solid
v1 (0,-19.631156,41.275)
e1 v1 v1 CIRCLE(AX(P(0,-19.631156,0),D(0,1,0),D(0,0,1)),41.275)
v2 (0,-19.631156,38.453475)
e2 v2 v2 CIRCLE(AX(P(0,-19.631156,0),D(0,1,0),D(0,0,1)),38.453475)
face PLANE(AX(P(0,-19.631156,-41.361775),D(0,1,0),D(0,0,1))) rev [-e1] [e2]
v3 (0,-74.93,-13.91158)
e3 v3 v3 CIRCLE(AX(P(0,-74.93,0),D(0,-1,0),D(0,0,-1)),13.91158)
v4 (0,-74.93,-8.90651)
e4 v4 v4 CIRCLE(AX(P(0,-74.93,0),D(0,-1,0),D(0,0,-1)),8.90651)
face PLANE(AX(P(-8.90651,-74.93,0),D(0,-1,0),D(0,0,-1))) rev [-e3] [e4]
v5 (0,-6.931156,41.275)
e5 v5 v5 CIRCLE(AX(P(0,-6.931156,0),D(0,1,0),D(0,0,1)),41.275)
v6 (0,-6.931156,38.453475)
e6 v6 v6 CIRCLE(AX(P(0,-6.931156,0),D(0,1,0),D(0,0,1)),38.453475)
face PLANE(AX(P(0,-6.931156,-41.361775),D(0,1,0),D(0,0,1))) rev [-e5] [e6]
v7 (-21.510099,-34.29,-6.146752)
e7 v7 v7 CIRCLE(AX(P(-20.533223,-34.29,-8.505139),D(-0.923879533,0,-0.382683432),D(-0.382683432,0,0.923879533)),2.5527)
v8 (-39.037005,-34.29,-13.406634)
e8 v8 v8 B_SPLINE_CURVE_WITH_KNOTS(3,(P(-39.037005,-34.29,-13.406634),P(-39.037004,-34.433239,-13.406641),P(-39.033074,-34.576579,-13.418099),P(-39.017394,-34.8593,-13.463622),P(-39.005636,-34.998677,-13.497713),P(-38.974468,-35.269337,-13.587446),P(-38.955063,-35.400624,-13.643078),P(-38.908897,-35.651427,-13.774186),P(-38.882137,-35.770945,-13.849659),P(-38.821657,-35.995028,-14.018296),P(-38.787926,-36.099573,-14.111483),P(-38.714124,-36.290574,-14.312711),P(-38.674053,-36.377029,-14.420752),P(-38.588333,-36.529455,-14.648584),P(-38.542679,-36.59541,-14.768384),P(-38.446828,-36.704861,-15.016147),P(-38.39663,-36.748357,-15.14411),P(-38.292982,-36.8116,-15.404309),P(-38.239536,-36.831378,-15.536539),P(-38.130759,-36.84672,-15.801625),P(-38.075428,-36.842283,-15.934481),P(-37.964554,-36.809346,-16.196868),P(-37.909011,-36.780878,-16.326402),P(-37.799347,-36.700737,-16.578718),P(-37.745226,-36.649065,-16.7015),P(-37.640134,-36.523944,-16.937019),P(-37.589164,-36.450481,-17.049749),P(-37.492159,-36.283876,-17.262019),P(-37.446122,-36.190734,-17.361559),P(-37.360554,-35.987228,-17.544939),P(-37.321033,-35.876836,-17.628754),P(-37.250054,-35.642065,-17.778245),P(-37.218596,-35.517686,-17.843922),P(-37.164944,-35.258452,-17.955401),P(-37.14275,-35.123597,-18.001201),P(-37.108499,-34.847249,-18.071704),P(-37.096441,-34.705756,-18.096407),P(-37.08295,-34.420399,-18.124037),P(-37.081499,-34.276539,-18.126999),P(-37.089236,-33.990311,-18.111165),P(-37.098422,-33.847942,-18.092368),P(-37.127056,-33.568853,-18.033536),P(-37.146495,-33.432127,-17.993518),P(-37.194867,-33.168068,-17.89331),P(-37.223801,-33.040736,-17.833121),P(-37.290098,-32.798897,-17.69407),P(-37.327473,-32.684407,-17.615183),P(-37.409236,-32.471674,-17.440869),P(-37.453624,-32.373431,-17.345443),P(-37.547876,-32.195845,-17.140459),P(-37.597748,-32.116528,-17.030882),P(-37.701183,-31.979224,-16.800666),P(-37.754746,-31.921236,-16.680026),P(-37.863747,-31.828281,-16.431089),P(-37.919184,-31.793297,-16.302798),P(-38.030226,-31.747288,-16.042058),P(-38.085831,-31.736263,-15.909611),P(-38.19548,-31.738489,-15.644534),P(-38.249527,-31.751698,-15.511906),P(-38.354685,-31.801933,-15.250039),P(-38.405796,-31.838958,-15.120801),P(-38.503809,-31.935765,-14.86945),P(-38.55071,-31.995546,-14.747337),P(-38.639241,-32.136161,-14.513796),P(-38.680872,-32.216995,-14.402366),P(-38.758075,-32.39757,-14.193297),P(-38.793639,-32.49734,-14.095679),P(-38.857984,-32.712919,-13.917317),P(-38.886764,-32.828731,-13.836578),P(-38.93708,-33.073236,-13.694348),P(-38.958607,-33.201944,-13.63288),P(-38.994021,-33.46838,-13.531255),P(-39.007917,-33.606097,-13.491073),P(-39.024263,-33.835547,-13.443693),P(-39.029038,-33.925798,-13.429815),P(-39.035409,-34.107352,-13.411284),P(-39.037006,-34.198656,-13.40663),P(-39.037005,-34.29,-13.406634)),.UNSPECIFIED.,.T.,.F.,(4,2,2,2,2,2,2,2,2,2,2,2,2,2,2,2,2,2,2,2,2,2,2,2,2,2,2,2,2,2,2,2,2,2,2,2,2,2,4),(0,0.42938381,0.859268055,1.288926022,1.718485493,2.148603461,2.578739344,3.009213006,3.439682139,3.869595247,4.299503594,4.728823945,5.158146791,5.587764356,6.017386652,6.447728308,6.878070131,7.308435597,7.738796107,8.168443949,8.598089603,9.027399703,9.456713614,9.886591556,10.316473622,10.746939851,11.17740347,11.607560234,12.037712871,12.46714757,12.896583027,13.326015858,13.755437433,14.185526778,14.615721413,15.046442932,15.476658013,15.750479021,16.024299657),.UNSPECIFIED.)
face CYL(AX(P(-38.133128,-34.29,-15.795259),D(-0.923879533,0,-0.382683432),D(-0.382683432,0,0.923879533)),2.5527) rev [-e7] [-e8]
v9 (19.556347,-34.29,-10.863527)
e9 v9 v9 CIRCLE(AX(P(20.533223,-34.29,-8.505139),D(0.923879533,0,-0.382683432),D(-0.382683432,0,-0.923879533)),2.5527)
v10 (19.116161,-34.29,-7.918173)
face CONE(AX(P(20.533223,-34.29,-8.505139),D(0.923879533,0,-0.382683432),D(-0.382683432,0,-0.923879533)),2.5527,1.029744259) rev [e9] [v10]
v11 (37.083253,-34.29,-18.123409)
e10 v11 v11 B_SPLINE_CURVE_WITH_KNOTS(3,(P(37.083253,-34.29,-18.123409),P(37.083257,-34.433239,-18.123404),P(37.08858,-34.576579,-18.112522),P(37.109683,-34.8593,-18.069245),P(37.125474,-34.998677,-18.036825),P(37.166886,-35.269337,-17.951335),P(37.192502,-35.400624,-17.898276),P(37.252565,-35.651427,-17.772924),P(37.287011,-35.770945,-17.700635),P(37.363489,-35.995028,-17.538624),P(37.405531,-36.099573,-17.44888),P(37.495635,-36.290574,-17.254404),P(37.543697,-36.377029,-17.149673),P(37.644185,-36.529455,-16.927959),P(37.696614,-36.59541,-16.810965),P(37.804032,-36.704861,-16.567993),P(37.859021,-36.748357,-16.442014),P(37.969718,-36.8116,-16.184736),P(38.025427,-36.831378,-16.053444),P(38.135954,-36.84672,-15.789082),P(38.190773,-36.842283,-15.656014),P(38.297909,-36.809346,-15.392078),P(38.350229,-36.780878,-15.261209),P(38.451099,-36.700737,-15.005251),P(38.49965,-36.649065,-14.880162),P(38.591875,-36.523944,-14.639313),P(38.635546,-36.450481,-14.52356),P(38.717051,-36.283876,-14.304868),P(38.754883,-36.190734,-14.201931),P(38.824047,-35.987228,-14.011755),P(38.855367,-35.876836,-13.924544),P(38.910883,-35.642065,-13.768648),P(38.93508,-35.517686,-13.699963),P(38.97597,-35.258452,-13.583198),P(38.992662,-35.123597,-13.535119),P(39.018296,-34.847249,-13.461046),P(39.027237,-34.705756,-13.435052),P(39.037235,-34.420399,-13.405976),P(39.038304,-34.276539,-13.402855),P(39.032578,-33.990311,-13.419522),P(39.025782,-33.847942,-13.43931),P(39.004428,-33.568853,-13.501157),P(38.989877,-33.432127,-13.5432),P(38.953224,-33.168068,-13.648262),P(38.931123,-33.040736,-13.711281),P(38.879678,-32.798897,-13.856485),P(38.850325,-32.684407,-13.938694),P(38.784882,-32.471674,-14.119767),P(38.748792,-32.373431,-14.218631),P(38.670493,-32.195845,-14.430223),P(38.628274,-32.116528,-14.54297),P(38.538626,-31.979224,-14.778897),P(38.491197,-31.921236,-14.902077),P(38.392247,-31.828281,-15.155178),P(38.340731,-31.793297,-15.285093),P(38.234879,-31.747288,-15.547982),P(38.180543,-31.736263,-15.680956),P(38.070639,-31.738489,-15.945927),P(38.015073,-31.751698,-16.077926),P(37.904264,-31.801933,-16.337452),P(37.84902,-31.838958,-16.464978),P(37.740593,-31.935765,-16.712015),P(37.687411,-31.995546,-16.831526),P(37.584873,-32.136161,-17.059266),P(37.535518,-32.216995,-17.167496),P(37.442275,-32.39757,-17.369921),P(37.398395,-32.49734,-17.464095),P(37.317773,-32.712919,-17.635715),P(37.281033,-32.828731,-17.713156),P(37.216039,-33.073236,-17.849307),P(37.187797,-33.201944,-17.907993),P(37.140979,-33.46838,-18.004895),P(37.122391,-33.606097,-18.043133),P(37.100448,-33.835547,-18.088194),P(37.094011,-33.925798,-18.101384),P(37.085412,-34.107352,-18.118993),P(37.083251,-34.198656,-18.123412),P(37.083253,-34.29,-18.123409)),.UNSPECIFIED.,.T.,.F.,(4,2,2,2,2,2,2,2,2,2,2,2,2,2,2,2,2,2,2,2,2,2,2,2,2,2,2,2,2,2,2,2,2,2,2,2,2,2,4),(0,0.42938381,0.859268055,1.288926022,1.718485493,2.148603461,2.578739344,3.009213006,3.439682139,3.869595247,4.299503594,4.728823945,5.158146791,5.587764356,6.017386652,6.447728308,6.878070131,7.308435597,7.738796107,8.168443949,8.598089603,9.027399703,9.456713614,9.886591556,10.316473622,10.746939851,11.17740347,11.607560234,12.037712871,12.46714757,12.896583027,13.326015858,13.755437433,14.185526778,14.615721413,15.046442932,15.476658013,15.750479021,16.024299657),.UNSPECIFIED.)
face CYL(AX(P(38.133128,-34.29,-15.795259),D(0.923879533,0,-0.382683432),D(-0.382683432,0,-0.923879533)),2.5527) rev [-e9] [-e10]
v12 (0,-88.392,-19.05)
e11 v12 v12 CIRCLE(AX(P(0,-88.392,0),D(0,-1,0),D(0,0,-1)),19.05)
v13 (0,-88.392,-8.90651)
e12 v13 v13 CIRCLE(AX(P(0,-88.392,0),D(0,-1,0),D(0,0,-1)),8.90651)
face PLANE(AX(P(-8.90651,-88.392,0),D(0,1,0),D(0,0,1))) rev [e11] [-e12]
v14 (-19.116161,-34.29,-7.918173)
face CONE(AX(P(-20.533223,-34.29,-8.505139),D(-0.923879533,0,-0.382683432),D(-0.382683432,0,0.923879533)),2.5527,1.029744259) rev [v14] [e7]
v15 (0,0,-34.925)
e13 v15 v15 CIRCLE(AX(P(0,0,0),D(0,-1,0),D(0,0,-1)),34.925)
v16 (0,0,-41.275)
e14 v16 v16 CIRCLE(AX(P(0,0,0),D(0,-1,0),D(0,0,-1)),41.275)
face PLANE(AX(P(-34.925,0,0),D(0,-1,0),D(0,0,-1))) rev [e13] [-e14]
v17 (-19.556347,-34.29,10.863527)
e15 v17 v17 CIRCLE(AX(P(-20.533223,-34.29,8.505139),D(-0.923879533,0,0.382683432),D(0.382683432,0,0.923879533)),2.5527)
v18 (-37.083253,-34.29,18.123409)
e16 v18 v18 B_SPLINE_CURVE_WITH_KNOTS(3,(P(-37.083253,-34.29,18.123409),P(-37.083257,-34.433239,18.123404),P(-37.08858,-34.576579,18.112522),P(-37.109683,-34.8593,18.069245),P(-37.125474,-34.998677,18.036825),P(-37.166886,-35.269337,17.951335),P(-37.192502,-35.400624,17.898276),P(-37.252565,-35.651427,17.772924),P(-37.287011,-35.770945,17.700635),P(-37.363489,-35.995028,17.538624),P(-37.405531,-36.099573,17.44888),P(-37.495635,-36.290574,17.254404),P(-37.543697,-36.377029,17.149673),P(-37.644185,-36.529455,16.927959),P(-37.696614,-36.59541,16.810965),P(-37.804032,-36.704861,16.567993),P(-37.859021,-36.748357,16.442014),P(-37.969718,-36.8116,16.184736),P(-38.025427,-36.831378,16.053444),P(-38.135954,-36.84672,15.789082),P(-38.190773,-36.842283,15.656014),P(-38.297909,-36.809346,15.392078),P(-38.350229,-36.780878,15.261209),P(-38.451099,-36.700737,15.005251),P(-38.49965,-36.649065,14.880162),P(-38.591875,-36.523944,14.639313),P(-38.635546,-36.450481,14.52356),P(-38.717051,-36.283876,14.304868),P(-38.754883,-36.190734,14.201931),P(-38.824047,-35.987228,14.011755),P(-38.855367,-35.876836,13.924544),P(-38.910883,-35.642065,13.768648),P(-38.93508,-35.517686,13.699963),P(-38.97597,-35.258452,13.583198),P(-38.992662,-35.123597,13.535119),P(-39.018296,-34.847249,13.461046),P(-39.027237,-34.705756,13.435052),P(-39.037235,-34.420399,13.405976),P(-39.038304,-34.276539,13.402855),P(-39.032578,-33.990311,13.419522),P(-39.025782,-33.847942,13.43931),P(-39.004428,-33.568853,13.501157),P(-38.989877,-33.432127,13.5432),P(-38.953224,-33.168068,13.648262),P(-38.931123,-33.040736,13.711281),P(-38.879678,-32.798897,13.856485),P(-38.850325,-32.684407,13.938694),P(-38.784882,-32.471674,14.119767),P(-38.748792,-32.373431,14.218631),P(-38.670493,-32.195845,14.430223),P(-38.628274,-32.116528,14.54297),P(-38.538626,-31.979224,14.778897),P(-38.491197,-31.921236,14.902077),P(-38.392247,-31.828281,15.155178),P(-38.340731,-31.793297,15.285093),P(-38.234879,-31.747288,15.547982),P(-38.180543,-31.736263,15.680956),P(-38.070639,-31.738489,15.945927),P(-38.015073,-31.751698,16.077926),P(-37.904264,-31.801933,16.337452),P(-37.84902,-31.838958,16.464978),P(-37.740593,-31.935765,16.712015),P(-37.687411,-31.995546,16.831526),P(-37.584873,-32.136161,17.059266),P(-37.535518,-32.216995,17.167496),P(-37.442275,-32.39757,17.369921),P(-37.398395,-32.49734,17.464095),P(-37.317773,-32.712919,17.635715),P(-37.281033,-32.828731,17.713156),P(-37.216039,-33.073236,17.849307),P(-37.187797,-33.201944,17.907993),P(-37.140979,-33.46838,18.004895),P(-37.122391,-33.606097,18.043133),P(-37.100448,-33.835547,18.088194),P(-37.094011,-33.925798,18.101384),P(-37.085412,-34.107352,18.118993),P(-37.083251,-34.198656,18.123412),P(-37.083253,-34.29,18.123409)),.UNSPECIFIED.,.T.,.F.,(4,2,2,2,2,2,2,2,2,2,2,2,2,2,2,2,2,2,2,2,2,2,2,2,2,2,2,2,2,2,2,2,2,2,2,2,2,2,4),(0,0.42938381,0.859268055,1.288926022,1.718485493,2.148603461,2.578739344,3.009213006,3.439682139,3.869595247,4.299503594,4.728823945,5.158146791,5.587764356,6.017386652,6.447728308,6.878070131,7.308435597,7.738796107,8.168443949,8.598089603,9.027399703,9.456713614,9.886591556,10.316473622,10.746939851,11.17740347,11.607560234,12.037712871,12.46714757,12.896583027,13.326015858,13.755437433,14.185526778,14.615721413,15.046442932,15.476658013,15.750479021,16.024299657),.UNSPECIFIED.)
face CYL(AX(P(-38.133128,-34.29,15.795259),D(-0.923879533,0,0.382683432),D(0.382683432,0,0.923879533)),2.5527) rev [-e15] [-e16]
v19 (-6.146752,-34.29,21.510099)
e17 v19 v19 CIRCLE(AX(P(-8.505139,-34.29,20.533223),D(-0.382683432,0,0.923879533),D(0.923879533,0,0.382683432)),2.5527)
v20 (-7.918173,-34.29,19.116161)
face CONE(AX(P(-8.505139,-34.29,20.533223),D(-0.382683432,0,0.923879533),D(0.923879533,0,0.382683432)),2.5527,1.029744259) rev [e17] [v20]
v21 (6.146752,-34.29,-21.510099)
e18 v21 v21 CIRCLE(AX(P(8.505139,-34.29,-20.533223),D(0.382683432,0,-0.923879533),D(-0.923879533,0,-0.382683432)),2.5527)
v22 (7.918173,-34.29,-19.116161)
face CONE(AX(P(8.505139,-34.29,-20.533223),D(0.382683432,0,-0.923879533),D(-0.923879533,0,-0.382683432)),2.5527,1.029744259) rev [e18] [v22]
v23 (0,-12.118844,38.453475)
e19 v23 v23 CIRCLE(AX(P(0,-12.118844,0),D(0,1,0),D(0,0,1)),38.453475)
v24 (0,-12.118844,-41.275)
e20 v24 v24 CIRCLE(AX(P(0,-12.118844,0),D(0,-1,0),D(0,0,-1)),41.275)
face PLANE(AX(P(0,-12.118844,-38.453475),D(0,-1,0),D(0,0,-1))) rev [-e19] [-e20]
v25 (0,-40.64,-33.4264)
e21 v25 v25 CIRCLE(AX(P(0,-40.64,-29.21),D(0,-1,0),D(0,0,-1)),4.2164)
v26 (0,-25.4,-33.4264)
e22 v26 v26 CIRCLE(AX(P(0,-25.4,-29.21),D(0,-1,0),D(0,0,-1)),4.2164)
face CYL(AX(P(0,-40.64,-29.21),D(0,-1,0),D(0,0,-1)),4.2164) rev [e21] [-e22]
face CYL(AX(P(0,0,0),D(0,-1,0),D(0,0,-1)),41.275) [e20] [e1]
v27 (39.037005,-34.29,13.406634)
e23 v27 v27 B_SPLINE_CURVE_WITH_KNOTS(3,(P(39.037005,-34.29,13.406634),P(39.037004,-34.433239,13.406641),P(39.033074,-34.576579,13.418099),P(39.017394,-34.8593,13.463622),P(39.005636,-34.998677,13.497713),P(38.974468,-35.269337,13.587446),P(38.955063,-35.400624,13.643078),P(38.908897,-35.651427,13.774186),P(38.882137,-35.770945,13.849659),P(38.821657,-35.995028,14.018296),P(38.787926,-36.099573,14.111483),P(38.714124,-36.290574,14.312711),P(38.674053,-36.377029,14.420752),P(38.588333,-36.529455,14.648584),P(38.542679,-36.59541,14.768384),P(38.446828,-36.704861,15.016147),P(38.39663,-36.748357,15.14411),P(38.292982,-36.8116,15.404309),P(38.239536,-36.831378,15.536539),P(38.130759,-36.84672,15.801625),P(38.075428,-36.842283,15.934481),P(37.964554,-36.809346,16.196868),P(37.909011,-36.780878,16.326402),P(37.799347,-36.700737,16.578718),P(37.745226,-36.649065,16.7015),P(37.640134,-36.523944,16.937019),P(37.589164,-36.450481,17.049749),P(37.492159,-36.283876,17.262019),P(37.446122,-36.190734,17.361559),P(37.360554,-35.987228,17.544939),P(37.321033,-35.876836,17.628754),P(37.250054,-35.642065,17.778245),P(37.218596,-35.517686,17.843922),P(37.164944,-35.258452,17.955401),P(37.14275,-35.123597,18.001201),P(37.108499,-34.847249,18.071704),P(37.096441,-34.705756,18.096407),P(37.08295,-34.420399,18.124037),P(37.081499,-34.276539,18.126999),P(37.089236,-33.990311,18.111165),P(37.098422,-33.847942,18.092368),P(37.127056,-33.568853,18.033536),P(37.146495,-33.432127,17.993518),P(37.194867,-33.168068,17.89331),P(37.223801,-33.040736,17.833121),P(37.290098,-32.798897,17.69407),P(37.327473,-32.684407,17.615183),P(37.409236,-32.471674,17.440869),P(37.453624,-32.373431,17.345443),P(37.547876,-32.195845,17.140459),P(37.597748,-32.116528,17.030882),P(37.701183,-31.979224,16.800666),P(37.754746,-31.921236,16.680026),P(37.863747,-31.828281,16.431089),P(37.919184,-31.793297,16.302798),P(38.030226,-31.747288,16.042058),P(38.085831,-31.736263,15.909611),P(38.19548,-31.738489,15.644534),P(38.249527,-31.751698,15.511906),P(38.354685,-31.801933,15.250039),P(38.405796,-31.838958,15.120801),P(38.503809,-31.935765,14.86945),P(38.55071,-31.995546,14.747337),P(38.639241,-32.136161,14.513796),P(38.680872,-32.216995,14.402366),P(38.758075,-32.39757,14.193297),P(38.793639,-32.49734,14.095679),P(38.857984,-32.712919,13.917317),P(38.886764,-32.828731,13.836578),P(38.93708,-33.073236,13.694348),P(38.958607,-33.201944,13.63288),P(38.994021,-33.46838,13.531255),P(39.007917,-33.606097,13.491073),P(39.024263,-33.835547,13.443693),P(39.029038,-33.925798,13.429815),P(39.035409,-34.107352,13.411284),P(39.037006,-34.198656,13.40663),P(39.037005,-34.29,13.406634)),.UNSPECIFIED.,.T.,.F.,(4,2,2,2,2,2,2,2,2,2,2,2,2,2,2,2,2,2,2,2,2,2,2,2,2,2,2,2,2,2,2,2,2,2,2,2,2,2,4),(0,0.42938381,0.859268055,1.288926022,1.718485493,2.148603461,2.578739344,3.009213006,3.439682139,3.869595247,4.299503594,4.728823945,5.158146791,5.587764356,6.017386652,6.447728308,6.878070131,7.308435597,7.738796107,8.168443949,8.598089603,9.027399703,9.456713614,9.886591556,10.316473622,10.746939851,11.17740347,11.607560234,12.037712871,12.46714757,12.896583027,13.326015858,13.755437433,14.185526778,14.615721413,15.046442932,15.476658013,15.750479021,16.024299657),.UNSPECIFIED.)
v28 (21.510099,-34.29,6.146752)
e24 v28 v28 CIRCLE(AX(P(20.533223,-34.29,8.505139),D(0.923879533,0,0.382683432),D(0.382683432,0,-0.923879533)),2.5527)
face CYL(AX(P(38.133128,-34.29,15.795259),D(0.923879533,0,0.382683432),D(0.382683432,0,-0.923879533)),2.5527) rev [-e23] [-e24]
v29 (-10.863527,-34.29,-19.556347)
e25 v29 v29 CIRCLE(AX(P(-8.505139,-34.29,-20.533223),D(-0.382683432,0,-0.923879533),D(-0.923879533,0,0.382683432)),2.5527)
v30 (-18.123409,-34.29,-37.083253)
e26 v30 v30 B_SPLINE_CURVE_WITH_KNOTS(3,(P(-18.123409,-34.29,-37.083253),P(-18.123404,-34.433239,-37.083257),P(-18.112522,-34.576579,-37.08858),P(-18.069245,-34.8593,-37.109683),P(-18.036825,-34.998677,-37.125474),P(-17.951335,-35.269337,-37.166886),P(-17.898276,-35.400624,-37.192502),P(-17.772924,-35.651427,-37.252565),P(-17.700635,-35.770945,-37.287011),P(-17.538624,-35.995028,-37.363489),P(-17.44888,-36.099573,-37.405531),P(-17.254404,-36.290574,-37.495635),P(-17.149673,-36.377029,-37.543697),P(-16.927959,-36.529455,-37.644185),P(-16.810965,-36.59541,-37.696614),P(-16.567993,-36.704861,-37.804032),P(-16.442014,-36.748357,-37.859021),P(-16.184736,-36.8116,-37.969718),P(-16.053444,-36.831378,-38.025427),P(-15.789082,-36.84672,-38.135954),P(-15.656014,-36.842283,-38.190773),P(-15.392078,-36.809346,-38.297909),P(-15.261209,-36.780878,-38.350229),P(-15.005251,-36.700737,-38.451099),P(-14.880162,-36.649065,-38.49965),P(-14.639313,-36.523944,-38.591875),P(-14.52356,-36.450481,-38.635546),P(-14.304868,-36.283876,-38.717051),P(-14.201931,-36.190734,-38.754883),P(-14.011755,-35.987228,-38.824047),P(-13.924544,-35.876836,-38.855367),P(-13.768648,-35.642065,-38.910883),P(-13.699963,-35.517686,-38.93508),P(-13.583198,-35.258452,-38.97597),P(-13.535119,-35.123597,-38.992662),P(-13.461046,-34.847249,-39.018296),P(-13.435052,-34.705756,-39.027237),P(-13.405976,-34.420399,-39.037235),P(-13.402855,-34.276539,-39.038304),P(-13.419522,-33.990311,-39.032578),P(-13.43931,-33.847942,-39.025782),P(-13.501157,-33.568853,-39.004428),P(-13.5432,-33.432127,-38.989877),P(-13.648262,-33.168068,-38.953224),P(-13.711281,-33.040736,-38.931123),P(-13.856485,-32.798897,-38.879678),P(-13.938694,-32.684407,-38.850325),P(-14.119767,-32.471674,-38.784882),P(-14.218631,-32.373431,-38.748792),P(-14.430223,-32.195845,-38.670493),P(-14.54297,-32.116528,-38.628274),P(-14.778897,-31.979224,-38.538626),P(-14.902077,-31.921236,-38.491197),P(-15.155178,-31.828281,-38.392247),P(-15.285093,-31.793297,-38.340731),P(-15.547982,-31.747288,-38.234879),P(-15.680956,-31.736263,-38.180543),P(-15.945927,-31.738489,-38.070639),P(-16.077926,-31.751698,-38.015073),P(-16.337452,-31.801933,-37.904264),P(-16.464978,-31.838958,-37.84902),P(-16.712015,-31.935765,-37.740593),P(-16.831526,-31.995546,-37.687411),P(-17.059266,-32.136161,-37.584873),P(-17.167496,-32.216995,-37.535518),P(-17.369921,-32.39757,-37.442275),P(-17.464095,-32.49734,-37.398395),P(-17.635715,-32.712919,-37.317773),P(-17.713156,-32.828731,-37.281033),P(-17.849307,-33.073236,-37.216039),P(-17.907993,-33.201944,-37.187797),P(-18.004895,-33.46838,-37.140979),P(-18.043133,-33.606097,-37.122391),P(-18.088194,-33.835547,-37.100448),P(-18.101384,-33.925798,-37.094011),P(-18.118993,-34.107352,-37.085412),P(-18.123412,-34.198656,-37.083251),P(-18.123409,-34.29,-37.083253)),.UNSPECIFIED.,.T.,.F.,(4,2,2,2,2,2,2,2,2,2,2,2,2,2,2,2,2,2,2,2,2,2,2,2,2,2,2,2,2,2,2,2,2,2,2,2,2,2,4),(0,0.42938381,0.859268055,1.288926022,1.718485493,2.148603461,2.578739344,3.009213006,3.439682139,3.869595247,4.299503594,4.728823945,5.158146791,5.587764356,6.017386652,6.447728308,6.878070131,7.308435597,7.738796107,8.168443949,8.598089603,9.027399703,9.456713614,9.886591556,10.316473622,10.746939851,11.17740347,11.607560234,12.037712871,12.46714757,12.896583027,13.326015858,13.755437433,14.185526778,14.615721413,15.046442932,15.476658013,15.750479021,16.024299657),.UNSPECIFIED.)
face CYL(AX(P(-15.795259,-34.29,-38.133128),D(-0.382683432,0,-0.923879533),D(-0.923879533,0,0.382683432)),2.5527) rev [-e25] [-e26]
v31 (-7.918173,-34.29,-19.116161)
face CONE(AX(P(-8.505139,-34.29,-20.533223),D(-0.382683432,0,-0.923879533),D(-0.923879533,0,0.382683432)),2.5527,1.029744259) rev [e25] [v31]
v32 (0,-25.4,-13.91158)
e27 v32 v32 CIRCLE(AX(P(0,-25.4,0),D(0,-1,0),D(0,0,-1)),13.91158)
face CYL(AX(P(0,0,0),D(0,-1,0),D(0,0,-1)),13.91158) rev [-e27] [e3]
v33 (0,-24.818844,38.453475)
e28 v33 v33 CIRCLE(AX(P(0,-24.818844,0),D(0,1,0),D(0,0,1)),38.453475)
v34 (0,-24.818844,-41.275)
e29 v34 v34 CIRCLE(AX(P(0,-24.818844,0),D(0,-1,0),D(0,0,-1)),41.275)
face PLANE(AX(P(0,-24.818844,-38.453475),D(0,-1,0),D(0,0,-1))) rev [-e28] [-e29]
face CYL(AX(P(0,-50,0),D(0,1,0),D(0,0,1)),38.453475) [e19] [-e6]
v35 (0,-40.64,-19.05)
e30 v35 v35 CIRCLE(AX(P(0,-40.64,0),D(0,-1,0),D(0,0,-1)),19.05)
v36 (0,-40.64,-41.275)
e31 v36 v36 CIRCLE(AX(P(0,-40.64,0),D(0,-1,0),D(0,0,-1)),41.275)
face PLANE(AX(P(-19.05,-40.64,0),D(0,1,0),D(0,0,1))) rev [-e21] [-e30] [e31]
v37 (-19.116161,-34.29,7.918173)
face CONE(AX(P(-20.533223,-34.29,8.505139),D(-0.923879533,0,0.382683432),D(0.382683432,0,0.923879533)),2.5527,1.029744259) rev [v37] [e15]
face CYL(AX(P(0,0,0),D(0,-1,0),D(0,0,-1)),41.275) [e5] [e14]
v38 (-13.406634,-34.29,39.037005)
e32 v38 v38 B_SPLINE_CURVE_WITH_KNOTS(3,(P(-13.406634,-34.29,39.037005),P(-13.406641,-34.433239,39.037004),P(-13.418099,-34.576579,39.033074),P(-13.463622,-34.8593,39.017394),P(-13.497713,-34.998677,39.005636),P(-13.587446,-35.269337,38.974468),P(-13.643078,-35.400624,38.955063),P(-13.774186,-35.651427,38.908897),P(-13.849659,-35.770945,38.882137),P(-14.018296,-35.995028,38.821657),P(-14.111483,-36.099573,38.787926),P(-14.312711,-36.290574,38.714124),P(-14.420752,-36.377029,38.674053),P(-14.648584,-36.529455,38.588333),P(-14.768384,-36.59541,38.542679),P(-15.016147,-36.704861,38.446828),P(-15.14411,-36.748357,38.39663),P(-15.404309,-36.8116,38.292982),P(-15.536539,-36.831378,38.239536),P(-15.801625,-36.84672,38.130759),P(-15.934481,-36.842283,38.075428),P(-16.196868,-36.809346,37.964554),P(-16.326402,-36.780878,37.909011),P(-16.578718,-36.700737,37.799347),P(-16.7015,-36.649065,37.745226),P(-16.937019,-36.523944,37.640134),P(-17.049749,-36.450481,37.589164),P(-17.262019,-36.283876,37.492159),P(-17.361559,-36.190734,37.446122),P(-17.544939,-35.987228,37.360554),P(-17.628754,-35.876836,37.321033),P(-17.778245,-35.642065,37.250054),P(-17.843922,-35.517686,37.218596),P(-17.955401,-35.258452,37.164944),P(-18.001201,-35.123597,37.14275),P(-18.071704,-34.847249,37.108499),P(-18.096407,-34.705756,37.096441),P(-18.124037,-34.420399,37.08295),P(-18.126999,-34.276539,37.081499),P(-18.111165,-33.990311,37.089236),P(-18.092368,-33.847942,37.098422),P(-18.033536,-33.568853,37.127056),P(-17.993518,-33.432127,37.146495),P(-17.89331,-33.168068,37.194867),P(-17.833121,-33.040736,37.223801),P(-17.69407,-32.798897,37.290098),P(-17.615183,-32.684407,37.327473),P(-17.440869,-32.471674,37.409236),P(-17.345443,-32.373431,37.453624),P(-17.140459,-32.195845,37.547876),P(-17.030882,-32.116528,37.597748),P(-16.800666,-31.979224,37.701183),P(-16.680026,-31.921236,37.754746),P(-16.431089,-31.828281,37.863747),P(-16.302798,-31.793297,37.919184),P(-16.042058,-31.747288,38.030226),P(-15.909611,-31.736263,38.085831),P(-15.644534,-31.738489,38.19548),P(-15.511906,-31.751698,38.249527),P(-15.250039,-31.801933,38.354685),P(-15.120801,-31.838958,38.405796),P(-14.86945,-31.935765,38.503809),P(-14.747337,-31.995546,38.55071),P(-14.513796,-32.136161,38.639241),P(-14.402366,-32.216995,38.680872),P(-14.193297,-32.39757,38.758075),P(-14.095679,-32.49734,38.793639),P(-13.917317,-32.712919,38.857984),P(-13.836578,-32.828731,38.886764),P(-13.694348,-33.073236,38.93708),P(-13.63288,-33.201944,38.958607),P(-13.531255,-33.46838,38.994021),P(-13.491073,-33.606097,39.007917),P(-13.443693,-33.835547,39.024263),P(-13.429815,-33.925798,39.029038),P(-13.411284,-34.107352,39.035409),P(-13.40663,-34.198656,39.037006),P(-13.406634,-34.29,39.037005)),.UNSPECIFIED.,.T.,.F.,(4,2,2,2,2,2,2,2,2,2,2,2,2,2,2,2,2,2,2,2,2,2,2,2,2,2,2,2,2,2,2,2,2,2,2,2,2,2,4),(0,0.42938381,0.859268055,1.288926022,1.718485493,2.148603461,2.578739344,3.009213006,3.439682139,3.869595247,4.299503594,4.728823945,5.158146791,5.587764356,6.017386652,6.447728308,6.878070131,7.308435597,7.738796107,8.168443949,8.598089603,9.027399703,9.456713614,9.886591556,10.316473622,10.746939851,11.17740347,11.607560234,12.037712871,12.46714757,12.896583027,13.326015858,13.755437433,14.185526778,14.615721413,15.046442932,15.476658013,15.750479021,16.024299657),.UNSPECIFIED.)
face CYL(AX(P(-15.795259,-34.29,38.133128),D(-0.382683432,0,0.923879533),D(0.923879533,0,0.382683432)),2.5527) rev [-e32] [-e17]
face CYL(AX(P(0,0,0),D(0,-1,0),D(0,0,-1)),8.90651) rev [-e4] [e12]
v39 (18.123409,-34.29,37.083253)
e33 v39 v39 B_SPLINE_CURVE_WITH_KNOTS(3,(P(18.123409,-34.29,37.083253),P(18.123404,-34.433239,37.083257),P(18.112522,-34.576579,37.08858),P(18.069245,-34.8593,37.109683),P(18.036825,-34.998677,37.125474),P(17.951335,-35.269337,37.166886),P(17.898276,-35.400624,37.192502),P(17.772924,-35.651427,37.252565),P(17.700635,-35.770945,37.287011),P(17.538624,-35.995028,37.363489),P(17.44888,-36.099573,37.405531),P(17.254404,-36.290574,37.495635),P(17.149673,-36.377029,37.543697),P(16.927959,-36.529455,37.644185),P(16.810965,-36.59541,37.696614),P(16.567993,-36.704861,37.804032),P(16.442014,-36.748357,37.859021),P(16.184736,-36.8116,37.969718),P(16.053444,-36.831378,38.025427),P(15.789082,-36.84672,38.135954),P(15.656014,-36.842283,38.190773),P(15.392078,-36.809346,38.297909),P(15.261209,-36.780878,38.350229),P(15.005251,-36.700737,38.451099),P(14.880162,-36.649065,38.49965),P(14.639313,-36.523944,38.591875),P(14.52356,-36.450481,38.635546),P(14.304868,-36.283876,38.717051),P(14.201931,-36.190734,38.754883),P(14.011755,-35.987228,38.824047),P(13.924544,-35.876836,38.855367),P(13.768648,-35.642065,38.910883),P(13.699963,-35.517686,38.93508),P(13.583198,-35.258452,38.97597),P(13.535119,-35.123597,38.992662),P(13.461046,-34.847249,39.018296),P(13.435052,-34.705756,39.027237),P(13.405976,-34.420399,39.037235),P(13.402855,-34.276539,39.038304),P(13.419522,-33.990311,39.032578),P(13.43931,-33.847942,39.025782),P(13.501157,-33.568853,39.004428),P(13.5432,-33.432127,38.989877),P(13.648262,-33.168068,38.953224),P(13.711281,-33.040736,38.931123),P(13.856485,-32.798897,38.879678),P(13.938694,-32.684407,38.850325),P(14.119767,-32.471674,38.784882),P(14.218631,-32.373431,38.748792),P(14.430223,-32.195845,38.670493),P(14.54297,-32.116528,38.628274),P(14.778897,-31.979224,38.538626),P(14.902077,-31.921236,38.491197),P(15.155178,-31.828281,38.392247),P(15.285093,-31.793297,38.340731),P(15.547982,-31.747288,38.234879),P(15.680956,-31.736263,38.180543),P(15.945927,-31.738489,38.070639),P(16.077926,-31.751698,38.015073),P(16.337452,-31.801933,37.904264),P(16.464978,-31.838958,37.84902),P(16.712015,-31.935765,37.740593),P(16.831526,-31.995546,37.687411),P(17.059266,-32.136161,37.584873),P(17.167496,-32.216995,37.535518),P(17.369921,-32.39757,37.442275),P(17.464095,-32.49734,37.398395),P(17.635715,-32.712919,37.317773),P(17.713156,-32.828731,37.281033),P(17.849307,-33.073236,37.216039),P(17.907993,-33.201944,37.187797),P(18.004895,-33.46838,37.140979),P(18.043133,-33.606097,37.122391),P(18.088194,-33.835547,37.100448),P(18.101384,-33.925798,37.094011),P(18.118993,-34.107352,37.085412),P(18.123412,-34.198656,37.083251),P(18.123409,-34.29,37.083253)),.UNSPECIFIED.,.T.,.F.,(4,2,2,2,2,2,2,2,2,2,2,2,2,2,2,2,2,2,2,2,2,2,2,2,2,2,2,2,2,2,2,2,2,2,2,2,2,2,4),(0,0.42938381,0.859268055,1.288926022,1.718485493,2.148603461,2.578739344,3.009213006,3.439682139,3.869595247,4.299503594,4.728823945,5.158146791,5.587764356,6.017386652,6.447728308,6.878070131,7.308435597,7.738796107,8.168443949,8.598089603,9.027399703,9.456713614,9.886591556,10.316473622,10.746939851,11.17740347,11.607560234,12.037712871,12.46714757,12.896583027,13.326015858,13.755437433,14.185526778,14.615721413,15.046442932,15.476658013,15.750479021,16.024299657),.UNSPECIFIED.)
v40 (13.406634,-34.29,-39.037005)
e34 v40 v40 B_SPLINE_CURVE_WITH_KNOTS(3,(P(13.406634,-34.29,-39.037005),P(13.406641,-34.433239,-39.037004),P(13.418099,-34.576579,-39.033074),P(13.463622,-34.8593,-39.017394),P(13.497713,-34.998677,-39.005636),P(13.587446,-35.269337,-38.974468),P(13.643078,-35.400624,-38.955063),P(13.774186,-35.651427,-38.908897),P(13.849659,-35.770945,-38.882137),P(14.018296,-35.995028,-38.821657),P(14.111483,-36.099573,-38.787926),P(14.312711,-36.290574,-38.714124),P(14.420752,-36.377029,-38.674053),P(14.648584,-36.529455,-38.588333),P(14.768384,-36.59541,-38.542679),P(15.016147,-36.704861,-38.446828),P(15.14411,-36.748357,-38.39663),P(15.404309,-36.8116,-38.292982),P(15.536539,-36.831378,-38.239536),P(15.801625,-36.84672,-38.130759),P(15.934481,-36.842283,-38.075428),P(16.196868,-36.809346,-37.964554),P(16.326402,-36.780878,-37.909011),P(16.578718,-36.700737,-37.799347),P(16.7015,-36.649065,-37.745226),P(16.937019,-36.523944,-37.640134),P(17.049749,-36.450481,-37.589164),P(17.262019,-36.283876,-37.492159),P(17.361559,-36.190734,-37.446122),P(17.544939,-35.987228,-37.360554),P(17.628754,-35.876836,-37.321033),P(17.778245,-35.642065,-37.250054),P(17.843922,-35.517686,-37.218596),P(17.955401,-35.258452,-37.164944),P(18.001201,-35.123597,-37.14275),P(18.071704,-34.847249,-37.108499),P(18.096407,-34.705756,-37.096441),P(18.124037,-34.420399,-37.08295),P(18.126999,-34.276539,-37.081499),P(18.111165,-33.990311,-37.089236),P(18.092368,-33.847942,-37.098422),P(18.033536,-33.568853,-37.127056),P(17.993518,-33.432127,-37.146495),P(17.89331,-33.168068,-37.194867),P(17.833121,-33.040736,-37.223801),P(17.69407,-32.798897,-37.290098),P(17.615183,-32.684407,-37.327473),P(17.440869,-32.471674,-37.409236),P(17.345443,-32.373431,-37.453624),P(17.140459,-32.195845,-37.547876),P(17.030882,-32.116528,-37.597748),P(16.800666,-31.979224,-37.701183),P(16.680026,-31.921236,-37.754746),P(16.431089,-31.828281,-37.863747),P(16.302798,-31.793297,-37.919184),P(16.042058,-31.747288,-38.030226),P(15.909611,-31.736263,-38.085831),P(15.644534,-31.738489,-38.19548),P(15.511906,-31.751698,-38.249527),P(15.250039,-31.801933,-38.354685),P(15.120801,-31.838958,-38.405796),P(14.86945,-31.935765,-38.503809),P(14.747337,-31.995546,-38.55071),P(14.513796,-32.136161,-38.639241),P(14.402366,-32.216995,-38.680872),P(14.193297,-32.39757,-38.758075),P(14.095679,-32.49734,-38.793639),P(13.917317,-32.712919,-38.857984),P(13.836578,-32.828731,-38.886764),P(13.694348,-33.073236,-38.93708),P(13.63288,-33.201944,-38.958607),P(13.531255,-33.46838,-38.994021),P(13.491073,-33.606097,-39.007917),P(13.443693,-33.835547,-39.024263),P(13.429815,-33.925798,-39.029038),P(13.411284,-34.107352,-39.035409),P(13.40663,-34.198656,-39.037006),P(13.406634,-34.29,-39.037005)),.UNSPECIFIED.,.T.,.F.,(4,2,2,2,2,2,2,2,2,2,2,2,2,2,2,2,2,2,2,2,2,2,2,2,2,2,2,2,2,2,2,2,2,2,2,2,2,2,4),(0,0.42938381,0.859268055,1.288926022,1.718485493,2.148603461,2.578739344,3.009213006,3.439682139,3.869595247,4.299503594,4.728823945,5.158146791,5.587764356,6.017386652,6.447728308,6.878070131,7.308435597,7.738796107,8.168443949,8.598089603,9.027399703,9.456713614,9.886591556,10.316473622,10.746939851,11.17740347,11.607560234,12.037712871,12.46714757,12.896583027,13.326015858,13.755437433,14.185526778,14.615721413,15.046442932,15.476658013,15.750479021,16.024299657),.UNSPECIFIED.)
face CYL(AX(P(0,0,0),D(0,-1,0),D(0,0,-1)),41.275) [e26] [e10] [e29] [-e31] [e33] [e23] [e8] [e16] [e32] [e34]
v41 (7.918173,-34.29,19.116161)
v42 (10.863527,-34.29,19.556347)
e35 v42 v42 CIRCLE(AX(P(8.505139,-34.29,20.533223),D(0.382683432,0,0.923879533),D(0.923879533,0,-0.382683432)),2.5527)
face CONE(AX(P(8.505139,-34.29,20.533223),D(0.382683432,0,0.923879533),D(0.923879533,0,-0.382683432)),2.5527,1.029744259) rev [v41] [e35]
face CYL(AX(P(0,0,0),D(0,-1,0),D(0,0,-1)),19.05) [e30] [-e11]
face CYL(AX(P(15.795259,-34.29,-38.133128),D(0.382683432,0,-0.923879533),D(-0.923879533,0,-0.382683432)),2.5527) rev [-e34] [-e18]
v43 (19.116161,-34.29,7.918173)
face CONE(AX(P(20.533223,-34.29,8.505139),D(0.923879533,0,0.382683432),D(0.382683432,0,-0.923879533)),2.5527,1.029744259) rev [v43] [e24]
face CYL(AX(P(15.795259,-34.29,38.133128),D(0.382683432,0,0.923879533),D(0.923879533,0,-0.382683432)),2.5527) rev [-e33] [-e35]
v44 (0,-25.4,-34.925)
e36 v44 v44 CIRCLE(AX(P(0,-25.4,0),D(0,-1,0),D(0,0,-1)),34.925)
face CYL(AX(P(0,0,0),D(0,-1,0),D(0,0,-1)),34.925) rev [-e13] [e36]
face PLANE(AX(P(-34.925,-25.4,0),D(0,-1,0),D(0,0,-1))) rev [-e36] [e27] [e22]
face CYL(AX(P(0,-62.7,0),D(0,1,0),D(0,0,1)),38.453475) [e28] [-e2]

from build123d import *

# Parameters (mm, degrees)
CIRPATTERN1_COUNT        = 8
LPATTERN1_START          = -24.818843944
LPATTERN1_OUTLINE_R      = 41.275
LPATTERN1_OUTLINE_R_2    = 38.453474767
LPATTERN1_DEPTH          = 5.187687888
LPATTERN1_START_2        = -12.118843944
LPATTERN1_2_OUTLINE_R    = 41.275
LPATTERN1_2_OUTLINE_R_2  = 38.453474767
LPATTERN1_2_DEPTH        = 5.187687888
Q_0_332_DIAMETER_HOLE1_D = 8.4328


# Read off the part's stored shape, not the designer's step: LPattern1
with BuildPart() as part:
    # Sketch1 → Revolve1 (revolve)
    with BuildSketch(Plane.XY, mode=Mode.PRIVATE) as revolve1_sk:
        Polygon((-41.275, -40.64), (-41.275, 0), (-34.925, 0), (-34.925, -25.4), (-13.91158, -25.4), (-13.91158, -74.93), (-8.90651, -74.93), (-8.90651, -88.392), (-19.05, -88.392), (-19.05, -40.64), align=None)
    revolve(revolve1_sk.sketch.rotate(Axis((0, 0, 0), (0, 1, 0)), 270), axis=Axis((0, 0, 0), (0, 1, 0)))

    # Sketch8 → 1/4-20 Tapped Hole1 (revolve, cut)
    with BuildSketch(Plane(origin=(38.133127704, -34.29, -15.795258671), x_dir=(-0.38268343236509045, 0, -0.9238795325112865), z_dir=(0, 1, 0))):
        Polygon((0, 0), (0, 20.583816902), (2.5527, 19.05), (2.5527, 0), align=None)
    f_1_4_20_tapped_hole1 = revolve(axis=Axis((43.999762736, -34.29, -18.225298466), (-0.9238795325112865, 0, 0.38268343236509045)), mode=Mode.SUBTRACT)

    # CirPattern1: 1/4-20 Tapped Hole1 ×8 about axis
    cirpattern1_axis = Axis((0, -118.183018713, 0), (0, 1, 0))
    for i in range(1, CIRPATTERN1_COUNT):
        add(f_1_4_20_tapped_hole1.rotate(cirpattern1_axis, i * 360 / CIRPATTERN1_COUNT), mode=Mode.SUBTRACT)

    # LPattern1 outline → LPattern1 (cut)
    with BuildSketch(Plane(origin=(0, 0, 0), x_dir=(1, 0, 0), z_dir=(0, 1, 0)).offset(LPATTERN1_START)):
        Circle(LPATTERN1_OUTLINE_R)
        Circle(LPATTERN1_OUTLINE_R_2, mode=Mode.SUBTRACT)
    extrude(amount=LPATTERN1_DEPTH, mode=Mode.SUBTRACT)

    # LPattern1 2 outline → LPattern1 2 (cut)
    with BuildSketch(Plane(origin=(0, 0, 0), x_dir=(1, 0, 0), z_dir=(0, 1, 0)).offset(LPATTERN1_START_2)):
        Circle(LPATTERN1_2_OUTLINE_R)
        Circle(LPATTERN1_2_OUTLINE_R_2, mode=Mode.SUBTRACT)
    extrude(amount=LPATTERN1_2_DEPTH, mode=Mode.SUBTRACT)

    # Q (0.332) Diameter Hole1 (through all)
    with Locations(Plane(origin=(0, -40.64, 0), x_dir=(-1, 0, 0), z_dir=(0, -1, 0))):
        with Locations((0, 29.21)):
            Hole(Q_0_332_DIAMETER_HOLE1_D / 2)


solid = part.part
